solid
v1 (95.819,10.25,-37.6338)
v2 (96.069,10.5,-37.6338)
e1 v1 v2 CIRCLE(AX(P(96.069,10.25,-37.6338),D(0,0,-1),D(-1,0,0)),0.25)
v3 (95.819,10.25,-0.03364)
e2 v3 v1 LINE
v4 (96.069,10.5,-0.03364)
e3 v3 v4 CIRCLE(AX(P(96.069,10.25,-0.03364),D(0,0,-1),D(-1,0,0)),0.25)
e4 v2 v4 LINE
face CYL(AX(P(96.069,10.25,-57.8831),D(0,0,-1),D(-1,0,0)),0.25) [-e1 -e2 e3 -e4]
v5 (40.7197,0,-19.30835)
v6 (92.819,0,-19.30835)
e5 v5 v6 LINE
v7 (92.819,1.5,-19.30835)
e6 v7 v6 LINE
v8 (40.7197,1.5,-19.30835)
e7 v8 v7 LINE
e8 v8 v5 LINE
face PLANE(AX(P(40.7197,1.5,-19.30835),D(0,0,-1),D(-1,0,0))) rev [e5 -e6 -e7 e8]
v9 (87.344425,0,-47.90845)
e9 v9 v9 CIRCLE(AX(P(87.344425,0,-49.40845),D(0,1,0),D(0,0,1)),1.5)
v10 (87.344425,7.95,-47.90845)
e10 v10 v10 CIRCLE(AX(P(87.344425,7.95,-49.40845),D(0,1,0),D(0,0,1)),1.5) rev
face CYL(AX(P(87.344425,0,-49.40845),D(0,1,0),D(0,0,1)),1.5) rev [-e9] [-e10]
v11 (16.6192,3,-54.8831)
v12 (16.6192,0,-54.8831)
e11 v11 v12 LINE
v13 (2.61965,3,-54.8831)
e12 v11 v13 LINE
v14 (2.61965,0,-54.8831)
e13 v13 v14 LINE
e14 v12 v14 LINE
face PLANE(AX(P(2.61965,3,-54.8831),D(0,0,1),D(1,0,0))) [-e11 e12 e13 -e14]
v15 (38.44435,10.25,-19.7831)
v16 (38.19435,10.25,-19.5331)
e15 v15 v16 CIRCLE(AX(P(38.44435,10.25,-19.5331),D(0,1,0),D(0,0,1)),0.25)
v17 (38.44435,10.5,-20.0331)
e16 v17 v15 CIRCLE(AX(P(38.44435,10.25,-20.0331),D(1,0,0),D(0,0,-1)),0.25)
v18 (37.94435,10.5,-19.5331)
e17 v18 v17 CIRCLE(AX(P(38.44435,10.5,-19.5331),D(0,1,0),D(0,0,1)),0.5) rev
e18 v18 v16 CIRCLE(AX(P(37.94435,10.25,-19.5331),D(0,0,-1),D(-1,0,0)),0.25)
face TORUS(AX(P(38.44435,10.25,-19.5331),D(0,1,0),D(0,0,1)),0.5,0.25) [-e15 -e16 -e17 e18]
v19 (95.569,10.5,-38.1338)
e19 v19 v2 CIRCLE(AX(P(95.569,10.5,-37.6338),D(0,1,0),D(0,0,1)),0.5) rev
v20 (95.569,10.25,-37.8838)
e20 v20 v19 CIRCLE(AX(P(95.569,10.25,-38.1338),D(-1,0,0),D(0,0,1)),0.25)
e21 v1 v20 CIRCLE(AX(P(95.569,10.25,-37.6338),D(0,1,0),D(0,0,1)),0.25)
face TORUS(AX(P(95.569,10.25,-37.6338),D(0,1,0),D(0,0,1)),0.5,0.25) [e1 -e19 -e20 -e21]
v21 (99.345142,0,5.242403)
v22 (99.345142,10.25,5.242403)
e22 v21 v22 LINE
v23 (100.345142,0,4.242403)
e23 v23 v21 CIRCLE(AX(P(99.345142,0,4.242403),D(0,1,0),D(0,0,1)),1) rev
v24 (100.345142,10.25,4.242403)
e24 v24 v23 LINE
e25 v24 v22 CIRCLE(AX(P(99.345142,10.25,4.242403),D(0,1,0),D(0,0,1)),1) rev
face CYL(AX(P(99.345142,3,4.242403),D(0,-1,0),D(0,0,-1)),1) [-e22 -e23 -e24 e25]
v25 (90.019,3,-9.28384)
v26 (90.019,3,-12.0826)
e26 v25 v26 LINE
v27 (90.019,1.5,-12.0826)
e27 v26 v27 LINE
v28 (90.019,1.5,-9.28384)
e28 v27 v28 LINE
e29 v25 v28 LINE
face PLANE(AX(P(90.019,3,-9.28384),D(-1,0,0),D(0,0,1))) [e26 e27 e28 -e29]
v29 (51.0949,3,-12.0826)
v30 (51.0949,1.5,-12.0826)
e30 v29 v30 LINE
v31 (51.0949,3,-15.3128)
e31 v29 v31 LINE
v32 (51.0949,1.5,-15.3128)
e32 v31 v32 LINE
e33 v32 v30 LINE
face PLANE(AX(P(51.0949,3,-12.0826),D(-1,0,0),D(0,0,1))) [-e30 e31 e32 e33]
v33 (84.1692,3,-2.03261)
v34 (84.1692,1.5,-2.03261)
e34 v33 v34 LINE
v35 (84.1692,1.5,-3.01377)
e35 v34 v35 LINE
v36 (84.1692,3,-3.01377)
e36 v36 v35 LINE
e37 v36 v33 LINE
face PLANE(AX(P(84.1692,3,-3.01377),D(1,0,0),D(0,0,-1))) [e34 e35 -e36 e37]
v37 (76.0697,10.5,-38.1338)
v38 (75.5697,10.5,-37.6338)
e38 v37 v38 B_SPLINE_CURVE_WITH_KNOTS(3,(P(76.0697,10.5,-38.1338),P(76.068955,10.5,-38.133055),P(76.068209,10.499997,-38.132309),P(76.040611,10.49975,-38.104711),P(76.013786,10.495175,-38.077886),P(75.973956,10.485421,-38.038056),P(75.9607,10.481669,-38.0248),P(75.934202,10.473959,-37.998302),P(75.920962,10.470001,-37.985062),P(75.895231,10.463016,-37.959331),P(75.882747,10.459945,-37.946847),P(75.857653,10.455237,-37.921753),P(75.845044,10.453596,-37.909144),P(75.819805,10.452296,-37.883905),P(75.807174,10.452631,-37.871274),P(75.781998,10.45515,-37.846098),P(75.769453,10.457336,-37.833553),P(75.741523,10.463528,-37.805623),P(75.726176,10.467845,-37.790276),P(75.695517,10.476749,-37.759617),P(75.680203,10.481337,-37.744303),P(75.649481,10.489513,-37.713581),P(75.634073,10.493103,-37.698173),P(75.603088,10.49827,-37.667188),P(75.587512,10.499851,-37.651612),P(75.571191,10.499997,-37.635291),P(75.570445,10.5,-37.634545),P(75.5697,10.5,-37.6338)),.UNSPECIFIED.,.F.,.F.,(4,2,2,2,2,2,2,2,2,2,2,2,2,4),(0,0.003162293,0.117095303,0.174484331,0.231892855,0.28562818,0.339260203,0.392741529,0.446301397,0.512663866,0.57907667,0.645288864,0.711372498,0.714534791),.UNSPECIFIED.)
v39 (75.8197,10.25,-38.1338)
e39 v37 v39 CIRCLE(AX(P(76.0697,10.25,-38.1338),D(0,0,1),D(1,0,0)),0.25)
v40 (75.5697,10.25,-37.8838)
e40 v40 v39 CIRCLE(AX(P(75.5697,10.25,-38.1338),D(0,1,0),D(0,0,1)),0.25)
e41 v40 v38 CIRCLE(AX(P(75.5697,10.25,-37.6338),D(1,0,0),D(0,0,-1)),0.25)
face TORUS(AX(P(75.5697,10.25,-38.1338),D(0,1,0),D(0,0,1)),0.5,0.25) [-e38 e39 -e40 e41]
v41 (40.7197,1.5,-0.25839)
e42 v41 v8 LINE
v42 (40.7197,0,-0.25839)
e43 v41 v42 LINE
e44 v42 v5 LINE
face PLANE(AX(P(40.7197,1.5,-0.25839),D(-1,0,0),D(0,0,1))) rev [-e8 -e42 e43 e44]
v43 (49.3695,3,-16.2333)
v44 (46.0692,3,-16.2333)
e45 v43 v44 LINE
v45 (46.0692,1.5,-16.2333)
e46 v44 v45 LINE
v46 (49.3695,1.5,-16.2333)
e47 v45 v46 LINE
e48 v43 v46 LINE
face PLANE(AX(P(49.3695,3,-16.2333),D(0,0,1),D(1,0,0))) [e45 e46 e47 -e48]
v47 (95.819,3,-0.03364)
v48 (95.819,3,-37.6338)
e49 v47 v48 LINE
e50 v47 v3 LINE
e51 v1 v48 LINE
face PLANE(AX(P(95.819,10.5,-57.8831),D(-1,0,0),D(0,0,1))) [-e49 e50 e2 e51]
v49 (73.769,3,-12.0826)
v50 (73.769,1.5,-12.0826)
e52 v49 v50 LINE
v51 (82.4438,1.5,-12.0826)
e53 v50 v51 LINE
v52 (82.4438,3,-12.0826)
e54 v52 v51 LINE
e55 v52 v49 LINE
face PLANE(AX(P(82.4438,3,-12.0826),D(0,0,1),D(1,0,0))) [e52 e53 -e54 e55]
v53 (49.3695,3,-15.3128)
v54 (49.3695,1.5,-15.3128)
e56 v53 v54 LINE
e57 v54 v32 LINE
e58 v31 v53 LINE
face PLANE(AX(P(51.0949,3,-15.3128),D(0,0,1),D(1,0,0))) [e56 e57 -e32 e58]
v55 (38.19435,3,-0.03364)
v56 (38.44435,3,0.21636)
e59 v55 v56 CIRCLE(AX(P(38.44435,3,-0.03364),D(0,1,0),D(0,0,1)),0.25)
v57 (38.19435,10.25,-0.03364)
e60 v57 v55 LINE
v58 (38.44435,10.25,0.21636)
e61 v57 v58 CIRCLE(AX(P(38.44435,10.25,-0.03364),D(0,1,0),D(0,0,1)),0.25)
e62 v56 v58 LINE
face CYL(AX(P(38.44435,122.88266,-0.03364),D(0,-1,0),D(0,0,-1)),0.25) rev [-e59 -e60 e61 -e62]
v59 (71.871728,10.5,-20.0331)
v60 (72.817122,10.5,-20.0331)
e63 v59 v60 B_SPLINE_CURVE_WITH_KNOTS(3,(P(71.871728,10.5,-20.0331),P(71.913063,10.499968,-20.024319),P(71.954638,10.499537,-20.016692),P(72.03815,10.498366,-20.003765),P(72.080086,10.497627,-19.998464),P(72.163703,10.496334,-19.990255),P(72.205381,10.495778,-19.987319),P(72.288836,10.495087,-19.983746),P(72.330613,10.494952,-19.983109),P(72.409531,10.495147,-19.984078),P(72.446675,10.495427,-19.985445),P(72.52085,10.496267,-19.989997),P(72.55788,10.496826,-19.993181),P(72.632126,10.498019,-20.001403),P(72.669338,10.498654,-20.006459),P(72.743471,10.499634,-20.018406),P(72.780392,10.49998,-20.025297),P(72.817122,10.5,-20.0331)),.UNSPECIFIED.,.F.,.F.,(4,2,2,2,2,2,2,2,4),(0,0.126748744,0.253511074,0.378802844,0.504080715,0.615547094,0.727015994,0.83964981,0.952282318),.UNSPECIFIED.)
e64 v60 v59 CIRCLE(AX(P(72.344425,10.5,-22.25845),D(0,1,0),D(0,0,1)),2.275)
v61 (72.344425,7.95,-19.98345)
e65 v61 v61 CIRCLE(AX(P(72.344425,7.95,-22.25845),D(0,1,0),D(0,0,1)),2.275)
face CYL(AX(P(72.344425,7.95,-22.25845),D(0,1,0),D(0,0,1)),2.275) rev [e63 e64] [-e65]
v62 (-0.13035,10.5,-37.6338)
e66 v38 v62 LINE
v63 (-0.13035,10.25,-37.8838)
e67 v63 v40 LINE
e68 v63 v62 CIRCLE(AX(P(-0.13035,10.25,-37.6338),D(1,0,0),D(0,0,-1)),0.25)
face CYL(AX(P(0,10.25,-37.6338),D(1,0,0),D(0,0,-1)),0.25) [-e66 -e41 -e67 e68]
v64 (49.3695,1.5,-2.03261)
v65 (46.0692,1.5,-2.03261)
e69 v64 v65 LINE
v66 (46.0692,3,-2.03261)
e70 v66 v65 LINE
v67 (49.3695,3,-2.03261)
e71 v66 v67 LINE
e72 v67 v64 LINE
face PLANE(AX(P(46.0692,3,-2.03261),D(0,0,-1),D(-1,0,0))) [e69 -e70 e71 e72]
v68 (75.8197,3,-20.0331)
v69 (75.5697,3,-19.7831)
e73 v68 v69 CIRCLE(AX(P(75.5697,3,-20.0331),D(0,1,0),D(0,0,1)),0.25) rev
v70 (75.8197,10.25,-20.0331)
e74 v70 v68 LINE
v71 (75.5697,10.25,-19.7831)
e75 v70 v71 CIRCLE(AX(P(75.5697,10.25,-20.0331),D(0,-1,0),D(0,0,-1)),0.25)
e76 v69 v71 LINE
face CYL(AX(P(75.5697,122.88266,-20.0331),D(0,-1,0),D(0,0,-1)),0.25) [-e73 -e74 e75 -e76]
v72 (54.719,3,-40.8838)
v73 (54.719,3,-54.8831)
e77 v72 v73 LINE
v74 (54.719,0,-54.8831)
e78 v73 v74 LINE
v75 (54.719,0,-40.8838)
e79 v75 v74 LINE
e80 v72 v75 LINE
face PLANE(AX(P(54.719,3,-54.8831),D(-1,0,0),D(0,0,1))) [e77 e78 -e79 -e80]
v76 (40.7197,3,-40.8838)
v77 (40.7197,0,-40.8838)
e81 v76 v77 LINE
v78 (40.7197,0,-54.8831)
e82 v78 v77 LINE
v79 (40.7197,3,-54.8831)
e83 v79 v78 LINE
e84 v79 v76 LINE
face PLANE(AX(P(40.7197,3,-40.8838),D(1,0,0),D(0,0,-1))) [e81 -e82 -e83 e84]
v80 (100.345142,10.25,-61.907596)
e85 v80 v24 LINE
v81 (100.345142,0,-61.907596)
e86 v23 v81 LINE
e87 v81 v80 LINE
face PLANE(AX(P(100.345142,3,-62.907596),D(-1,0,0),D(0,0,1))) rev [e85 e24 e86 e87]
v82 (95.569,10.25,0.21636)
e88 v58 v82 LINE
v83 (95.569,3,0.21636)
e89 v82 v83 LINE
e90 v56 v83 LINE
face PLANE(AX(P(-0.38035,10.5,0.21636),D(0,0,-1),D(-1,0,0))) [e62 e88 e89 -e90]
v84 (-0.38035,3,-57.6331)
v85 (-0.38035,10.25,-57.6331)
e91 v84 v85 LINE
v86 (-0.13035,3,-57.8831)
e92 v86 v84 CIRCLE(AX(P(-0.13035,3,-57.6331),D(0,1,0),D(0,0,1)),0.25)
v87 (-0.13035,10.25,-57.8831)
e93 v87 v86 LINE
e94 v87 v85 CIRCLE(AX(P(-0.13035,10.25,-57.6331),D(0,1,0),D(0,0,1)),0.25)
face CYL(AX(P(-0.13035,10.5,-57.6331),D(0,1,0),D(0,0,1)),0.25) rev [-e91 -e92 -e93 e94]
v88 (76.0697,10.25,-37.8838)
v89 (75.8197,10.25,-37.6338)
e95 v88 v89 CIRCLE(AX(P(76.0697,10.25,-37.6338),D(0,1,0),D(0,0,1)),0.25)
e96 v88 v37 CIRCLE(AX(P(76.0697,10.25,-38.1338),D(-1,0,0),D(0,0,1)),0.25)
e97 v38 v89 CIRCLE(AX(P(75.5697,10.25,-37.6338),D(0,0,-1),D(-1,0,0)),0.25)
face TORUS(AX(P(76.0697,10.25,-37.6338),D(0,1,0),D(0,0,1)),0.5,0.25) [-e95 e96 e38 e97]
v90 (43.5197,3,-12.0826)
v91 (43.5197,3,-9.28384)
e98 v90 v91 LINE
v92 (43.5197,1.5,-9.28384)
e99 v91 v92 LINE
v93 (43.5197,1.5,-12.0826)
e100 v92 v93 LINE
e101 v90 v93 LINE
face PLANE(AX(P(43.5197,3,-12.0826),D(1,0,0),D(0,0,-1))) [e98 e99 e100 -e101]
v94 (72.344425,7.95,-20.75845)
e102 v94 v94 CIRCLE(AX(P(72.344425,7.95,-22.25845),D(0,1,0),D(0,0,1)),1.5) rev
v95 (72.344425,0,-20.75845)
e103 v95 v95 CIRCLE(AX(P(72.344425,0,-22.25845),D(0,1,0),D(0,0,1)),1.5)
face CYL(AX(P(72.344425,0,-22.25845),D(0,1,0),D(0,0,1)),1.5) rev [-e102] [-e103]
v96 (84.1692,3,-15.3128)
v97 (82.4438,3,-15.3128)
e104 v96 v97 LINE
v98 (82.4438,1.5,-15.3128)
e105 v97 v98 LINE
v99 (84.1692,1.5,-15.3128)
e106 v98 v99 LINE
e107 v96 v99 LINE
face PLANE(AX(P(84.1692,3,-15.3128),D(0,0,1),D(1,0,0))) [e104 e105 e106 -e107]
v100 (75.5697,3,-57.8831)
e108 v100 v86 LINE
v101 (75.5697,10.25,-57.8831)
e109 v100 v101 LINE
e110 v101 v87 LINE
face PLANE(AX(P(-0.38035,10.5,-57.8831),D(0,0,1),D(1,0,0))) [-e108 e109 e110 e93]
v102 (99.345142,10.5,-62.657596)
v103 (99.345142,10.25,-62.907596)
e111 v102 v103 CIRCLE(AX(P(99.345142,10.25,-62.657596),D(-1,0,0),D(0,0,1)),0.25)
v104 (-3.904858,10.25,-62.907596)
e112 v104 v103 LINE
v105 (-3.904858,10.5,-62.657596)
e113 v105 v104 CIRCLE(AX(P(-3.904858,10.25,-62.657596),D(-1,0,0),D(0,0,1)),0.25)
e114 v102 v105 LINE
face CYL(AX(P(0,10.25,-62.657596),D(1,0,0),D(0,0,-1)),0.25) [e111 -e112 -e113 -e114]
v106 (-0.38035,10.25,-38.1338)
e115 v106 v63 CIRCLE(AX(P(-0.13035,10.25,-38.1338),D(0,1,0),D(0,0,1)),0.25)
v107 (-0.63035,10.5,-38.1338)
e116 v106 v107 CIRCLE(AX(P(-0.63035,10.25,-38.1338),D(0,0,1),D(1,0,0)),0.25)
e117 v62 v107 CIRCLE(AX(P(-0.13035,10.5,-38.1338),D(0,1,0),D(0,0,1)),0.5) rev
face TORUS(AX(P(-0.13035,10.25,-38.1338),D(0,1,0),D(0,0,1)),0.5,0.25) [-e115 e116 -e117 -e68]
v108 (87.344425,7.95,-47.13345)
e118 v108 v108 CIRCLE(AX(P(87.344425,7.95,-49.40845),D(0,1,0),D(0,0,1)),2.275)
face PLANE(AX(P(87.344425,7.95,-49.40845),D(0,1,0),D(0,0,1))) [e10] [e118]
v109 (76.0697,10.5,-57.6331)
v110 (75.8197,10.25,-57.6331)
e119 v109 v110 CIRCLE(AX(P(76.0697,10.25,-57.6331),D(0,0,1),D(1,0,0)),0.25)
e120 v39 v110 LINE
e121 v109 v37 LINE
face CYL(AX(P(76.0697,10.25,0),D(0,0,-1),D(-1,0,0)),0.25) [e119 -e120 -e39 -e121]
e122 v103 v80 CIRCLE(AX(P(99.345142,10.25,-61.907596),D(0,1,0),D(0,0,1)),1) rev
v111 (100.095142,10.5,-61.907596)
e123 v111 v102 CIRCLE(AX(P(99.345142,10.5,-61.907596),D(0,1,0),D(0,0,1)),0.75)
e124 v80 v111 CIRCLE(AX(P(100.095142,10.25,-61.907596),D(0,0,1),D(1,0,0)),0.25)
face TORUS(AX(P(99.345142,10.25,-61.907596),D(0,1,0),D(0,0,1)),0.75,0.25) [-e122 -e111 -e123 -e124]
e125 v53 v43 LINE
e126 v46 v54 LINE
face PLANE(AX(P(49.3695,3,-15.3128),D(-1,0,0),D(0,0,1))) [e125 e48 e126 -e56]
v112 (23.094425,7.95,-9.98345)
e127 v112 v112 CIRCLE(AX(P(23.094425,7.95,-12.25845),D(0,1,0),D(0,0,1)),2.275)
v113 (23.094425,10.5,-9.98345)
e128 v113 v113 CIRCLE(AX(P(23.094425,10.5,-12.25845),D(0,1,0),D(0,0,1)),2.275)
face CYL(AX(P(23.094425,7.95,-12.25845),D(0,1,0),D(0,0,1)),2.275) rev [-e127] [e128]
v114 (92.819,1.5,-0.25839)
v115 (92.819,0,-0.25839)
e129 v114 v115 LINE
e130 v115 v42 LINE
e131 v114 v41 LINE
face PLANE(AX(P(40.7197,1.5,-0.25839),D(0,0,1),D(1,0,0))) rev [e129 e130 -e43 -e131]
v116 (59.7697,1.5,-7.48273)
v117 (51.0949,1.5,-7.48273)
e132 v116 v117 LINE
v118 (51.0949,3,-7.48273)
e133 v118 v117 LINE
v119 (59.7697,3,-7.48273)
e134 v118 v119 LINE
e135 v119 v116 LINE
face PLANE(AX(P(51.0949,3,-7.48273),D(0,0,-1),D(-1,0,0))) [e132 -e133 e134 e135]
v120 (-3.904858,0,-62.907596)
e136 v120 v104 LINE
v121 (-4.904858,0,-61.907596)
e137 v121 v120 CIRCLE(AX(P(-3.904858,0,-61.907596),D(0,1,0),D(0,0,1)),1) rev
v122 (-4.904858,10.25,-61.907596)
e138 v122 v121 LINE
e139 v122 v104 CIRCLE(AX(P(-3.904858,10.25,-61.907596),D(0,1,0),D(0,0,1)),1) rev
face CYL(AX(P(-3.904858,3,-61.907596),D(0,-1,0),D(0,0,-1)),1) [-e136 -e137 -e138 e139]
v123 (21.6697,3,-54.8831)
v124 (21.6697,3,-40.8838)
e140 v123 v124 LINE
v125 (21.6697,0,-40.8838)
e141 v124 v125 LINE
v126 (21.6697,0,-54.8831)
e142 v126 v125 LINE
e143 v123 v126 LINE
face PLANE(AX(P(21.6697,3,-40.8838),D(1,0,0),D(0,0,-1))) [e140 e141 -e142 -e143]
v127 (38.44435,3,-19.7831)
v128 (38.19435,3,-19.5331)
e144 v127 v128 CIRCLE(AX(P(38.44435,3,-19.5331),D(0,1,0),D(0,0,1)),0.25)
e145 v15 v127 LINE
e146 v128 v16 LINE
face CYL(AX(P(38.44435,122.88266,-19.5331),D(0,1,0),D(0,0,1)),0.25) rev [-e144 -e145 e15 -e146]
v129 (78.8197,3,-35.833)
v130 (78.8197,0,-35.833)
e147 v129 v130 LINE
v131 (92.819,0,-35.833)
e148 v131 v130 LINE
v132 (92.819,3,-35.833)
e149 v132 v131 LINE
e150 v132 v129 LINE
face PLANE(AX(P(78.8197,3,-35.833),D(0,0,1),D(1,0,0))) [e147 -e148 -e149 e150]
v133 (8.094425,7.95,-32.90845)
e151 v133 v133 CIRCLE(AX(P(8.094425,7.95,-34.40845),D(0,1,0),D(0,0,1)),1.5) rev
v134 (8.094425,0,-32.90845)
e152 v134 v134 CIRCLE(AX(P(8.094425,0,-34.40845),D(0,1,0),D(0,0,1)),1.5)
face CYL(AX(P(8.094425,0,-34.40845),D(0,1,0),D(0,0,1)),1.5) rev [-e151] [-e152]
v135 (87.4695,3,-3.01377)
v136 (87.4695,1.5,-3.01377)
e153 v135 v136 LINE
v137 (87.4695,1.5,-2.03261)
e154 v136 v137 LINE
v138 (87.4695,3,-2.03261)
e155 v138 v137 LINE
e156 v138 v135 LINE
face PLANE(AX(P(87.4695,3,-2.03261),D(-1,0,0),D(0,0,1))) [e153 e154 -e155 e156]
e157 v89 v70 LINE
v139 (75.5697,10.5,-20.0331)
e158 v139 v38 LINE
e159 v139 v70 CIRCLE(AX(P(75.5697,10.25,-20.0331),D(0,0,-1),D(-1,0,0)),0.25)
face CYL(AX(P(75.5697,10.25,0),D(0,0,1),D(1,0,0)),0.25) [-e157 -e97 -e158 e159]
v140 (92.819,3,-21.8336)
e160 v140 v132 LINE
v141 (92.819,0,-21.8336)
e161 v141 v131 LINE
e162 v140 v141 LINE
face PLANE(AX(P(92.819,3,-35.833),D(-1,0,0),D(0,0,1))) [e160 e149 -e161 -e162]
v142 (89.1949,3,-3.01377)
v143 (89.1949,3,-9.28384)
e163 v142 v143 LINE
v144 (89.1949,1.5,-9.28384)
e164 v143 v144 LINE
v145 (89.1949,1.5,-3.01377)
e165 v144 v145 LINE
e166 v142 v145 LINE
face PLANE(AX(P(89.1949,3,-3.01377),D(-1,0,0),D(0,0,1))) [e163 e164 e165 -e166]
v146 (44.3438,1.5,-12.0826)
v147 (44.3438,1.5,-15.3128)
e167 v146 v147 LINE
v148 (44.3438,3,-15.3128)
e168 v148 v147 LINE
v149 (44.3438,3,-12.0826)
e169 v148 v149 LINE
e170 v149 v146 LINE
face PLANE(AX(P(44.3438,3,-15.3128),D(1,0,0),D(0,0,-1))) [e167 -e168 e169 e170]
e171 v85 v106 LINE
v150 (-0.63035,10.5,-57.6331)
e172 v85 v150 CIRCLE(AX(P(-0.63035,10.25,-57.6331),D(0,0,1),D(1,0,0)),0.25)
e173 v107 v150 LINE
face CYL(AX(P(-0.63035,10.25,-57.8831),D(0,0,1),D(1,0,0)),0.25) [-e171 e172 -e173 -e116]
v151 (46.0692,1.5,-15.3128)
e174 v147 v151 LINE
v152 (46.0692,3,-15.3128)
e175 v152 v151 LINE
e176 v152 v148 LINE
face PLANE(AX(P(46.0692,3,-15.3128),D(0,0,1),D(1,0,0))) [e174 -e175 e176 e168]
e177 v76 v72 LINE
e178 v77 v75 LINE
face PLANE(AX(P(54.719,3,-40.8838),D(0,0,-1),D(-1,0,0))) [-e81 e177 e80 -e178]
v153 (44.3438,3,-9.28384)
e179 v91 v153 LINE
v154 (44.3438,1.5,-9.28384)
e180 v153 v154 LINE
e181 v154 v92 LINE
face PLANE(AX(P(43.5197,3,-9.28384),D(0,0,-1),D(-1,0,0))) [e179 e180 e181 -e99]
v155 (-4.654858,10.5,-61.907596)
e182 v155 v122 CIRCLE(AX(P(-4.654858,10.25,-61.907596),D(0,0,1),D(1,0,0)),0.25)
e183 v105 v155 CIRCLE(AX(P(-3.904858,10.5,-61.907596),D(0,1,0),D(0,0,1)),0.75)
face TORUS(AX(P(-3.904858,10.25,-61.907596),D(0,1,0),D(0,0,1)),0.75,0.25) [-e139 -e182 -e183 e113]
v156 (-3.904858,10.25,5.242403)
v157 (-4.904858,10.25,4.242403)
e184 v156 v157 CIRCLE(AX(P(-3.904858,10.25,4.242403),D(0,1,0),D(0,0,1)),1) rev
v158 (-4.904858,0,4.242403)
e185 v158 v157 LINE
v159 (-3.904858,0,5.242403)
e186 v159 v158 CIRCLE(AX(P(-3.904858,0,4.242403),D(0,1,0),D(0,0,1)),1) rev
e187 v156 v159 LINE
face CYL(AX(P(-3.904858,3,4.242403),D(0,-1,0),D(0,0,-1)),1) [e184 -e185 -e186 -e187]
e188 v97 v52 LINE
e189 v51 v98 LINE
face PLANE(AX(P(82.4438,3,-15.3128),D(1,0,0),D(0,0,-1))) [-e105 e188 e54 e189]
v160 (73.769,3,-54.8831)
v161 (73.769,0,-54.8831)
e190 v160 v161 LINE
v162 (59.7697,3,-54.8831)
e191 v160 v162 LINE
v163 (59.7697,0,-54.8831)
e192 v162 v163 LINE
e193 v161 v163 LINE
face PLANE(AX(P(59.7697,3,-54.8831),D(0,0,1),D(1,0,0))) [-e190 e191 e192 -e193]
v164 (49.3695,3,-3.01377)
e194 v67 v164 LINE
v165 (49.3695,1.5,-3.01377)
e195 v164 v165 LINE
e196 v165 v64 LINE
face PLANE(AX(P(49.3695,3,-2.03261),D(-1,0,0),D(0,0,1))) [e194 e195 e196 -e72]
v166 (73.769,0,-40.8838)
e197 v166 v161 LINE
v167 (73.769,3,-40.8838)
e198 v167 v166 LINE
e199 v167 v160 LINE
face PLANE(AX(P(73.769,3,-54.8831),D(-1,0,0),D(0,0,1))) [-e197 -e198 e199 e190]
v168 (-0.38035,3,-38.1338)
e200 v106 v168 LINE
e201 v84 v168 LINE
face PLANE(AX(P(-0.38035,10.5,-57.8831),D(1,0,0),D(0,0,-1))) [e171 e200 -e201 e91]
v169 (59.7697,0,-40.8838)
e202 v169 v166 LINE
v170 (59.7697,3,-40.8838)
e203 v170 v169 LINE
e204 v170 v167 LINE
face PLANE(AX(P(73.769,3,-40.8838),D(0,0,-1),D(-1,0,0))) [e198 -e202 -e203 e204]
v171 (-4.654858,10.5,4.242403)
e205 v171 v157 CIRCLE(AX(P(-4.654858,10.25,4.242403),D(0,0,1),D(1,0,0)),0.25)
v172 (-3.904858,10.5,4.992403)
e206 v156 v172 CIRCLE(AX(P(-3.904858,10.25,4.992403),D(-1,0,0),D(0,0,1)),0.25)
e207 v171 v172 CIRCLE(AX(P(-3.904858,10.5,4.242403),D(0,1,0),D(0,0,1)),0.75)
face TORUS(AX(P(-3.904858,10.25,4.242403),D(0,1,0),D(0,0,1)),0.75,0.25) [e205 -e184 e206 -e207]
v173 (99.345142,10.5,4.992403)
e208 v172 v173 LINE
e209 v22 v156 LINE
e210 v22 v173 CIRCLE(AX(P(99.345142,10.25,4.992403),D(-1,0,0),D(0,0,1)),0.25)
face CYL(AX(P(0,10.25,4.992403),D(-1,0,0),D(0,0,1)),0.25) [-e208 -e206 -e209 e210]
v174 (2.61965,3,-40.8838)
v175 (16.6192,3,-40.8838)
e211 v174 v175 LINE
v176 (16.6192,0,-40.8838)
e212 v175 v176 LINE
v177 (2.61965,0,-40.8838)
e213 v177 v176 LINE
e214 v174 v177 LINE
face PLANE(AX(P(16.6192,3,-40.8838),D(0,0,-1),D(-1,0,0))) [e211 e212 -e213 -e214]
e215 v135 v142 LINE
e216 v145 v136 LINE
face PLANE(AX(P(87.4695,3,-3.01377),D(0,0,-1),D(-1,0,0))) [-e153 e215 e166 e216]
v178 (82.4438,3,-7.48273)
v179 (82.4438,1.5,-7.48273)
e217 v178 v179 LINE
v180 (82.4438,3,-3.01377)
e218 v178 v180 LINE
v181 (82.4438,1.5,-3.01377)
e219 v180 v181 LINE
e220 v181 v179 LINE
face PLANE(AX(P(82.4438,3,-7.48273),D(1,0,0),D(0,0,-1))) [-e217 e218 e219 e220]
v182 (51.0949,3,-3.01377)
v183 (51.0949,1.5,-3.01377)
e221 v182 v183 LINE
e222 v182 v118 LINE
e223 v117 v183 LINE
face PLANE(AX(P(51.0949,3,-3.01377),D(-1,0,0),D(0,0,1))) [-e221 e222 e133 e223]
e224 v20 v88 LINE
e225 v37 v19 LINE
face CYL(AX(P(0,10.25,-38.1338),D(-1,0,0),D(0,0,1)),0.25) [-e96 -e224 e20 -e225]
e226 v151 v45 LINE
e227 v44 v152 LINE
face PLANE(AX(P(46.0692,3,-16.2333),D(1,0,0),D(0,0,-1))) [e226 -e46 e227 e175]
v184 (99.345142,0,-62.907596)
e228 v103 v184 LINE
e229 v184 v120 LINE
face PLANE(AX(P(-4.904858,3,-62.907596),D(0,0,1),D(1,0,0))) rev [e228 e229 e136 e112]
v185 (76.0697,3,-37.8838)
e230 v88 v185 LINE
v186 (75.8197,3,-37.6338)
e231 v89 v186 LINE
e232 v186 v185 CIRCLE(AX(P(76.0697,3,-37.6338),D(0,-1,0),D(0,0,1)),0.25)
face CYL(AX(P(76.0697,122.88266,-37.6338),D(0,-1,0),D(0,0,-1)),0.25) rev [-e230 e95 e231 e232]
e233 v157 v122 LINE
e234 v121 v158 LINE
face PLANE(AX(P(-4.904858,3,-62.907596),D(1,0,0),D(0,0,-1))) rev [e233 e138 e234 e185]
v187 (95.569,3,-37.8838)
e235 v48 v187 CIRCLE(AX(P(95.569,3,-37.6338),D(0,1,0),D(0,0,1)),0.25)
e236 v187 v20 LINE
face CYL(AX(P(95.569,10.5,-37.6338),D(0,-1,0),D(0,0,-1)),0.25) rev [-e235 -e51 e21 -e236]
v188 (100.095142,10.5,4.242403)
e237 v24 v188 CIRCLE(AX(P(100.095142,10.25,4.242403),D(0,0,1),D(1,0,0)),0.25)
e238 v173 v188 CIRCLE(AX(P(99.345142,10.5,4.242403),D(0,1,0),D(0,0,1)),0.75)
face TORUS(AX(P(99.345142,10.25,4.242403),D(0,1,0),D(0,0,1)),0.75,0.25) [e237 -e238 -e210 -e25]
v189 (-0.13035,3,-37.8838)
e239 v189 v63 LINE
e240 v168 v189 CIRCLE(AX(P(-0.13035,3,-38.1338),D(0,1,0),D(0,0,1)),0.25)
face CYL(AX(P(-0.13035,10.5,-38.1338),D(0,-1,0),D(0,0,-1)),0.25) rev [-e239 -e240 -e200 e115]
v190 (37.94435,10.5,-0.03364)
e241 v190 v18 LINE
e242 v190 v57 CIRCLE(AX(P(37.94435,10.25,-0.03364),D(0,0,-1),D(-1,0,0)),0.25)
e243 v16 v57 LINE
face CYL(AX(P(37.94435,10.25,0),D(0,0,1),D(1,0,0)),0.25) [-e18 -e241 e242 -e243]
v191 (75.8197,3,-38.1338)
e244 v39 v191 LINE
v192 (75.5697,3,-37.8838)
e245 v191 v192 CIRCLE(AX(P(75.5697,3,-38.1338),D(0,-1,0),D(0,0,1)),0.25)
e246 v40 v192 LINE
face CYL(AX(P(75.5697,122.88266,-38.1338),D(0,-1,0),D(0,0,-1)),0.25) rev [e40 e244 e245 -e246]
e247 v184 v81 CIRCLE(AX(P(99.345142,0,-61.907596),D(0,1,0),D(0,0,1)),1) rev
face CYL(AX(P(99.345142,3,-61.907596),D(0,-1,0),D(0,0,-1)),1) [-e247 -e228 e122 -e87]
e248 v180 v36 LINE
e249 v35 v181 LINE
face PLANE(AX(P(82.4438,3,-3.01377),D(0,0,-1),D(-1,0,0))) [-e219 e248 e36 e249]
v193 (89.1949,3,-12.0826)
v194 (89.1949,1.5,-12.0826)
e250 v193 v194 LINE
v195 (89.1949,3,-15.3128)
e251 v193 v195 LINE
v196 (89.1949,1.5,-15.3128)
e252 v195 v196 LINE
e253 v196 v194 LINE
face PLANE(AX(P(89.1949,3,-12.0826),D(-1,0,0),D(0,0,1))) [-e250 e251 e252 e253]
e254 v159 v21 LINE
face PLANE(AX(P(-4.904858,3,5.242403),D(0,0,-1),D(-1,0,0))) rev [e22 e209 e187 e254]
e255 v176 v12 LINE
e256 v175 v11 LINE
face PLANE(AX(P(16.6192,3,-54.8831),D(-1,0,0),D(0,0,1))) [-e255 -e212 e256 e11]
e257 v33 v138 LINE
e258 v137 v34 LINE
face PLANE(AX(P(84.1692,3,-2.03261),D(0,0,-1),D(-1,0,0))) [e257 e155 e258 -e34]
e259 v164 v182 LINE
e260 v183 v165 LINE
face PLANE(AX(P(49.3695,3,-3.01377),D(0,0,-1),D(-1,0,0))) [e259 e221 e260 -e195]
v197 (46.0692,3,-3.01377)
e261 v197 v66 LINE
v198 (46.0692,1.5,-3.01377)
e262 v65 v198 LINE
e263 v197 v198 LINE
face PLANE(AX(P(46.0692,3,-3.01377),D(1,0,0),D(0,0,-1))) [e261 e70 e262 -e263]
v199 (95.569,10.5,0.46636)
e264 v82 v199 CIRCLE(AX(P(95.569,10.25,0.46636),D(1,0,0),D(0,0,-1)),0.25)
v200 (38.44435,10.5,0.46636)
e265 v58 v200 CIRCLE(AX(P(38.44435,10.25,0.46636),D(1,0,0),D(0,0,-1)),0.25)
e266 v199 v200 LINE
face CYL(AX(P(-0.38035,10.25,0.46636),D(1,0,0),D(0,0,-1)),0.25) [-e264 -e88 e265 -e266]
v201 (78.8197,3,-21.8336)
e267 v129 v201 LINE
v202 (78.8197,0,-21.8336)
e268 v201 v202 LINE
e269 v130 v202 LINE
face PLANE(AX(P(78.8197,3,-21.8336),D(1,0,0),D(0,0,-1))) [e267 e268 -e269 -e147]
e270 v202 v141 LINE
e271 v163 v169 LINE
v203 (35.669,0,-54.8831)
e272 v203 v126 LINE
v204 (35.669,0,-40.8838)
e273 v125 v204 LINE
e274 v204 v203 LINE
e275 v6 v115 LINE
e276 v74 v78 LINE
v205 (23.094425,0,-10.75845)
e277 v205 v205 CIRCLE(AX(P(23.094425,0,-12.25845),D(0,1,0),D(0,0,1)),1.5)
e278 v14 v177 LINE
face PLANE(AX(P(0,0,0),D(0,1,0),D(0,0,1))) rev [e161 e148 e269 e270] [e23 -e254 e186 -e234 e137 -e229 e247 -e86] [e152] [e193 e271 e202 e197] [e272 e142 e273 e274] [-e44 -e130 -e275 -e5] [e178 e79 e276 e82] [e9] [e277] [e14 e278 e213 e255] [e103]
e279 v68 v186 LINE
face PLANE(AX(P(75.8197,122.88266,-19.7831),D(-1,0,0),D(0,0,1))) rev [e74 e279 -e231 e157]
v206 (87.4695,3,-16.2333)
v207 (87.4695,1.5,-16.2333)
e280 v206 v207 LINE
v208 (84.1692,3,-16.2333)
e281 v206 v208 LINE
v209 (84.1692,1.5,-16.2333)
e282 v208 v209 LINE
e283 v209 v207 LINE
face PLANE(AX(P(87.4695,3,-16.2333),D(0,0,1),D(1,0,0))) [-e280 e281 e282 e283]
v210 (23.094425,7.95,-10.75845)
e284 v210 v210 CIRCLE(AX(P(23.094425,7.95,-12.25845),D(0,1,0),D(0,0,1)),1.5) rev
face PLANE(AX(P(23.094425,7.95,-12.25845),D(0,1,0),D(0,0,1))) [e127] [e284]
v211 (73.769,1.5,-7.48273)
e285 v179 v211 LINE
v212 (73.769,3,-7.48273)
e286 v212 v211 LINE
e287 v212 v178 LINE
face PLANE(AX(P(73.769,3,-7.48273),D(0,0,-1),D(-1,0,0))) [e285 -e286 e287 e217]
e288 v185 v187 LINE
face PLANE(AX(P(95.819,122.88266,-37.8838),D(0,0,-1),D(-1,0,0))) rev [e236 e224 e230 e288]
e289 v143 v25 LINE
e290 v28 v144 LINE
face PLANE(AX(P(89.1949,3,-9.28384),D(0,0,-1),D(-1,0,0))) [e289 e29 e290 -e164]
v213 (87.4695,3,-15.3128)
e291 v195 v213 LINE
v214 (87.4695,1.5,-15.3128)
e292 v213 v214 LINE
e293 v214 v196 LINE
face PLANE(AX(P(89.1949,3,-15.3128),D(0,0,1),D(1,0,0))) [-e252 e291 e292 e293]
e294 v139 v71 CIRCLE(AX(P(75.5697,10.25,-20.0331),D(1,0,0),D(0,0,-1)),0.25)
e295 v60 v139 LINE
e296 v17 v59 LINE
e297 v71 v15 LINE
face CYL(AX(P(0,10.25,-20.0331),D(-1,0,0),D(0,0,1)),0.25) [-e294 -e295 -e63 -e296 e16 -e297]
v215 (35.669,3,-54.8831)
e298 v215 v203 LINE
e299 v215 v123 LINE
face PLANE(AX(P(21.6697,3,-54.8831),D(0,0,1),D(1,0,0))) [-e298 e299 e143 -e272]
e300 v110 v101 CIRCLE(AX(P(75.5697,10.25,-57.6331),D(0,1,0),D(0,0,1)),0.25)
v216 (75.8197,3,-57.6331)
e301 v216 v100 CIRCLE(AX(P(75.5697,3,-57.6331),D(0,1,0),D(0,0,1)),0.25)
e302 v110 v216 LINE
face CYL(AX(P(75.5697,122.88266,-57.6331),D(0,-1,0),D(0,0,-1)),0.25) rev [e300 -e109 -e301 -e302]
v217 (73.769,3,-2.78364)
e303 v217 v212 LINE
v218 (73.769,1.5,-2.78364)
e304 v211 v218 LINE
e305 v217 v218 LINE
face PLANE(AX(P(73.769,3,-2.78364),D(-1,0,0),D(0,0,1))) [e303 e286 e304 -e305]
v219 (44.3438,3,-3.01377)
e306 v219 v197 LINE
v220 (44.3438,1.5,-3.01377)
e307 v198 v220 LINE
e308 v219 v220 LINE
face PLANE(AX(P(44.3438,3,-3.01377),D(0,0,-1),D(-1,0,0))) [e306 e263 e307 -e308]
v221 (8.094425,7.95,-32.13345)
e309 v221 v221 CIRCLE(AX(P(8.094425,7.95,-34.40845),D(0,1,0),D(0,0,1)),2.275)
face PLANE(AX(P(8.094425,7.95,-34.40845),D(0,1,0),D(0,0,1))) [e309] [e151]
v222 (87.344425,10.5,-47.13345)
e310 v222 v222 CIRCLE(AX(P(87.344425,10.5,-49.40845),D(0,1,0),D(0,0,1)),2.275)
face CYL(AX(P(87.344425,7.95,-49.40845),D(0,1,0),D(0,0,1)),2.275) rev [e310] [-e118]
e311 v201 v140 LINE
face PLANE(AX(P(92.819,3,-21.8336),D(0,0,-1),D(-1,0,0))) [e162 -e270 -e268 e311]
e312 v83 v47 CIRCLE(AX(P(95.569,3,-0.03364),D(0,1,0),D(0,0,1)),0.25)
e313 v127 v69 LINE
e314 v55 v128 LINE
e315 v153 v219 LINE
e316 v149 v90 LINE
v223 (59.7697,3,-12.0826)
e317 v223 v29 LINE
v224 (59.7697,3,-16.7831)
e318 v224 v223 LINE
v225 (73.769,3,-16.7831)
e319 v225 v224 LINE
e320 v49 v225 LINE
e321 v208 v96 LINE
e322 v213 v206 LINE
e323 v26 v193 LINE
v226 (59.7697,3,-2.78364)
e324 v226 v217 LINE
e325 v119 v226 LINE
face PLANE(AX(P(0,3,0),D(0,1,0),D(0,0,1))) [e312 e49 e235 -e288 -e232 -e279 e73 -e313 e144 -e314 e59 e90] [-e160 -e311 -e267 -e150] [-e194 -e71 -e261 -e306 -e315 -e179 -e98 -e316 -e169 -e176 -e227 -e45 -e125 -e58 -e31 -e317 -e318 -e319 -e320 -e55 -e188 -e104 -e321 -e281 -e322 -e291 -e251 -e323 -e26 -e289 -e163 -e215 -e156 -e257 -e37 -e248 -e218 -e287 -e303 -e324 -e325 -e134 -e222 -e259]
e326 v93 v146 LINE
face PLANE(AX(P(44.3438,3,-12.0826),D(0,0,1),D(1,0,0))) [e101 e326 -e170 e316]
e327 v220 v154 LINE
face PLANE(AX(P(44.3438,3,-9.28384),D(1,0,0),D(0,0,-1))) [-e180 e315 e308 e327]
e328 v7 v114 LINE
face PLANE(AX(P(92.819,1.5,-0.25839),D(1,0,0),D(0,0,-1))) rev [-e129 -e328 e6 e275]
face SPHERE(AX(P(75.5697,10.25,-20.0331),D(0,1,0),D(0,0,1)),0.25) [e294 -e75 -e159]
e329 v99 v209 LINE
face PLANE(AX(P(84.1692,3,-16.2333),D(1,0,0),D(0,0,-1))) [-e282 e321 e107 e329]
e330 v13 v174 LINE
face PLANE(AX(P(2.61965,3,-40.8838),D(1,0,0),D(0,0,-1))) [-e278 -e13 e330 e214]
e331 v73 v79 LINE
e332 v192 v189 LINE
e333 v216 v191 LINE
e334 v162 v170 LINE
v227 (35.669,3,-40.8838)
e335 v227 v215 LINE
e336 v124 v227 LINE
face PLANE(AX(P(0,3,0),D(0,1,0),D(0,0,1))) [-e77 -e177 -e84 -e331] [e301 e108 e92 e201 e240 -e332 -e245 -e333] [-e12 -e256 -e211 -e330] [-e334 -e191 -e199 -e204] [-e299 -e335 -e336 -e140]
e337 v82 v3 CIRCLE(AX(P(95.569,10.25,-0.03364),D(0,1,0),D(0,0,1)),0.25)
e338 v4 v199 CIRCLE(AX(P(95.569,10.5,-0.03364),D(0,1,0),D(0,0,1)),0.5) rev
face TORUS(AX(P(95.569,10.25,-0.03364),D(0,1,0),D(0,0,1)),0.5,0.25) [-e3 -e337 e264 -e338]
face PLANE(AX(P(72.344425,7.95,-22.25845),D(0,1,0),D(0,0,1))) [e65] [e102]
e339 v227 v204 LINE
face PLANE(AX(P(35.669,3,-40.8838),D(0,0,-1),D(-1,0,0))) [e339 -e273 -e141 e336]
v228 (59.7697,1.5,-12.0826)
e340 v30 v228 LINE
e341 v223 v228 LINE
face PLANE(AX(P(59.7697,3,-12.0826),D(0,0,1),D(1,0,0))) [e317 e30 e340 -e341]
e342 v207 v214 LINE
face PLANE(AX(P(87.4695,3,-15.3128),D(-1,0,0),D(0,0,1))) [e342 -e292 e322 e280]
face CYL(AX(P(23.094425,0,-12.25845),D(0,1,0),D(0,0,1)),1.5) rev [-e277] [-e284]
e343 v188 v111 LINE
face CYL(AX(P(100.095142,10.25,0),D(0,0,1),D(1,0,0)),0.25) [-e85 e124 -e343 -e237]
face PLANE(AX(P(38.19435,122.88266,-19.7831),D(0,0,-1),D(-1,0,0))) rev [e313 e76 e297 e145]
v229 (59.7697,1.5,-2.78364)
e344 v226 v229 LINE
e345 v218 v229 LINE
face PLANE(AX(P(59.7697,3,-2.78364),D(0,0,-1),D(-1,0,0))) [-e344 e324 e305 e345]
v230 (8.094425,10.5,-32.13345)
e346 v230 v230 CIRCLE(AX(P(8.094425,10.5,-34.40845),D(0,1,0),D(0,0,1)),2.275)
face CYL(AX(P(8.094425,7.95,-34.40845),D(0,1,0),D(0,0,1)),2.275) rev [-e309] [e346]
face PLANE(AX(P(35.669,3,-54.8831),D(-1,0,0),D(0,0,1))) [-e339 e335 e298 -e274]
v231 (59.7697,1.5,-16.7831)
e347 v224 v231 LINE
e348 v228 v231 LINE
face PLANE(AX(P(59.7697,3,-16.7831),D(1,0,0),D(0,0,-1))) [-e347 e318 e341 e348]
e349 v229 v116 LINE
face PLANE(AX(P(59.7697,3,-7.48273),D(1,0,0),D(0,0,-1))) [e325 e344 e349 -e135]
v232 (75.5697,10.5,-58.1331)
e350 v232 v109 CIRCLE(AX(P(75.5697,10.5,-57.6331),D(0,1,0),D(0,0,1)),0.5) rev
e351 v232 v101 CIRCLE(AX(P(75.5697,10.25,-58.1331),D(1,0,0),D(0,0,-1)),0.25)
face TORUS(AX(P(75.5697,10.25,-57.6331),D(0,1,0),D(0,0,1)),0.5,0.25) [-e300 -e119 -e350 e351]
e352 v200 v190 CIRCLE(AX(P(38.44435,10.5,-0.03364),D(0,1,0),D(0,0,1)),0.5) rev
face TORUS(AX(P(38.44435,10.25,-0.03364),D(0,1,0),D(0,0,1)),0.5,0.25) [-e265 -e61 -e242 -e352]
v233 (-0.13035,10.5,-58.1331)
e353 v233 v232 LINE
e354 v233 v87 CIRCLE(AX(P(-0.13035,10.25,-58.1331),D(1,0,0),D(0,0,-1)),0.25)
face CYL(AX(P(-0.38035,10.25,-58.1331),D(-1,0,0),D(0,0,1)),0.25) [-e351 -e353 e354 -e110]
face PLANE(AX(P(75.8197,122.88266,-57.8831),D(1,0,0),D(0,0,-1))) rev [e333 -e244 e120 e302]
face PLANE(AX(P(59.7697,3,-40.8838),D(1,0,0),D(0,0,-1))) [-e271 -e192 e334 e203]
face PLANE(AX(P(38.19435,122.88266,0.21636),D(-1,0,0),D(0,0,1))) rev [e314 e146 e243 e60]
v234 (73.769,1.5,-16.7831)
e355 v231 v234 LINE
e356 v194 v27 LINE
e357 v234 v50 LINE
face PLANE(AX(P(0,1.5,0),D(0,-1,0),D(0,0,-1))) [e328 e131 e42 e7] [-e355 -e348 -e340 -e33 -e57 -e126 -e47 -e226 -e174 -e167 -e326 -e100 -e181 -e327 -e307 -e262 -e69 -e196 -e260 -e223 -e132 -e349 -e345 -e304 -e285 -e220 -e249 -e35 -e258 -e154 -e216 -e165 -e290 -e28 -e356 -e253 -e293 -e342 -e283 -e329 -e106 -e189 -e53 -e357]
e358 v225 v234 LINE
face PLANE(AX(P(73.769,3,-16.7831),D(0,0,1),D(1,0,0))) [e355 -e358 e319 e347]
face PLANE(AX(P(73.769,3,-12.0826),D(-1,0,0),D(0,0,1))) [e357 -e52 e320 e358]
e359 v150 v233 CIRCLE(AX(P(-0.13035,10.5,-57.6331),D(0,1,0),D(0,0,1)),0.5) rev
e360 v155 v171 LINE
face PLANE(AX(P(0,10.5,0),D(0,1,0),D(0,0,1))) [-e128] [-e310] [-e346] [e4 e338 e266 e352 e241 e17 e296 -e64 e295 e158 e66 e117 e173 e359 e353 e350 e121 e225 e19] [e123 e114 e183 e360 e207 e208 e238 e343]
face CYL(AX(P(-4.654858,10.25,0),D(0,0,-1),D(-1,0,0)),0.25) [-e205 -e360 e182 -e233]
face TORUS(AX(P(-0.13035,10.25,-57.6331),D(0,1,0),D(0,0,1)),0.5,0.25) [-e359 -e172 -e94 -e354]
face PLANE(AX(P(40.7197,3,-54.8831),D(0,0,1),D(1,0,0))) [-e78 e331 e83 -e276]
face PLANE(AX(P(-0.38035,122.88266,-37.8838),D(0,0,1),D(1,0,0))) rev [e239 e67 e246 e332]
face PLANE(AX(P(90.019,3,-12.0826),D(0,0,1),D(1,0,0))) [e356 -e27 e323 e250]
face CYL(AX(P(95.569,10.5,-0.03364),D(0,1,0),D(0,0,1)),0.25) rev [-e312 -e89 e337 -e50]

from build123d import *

# Parameters (mm, degrees)
SKETCH5_W           = 105.25
SKETCH5_H           = 68.15
SKETCH5_W_2         = 13.9993
SKETCH5_H_2         = 13.9994
SKETCH5_H_3         = 13.9993
SKETCH5_W_3         = 13.99955
BOSS_EXTRUDE1_DEPTH = 3
SKETCH6_W           = 52.0993
SKETCH6_H           = 19.04996
CUT_EXTRUDE1_DEPTH  = 1.5
SKETCH7_W           = 105.25
SKETCH7_H           = 68.15
SKETCH7_W_2         = 96.19935
SKETCH7_H_2         = 58.09946
BOSS_EXTRUDE2_DEPTH = 7.5
SKETCH9_R           = 1.5
CUT_EXTRUDE3_DEPTH  = 119.670818994
BOSS_EXTRUDE4_START = 7.5
SKETCH10_R          = 1.5
BOSS_EXTRUDE4_DEPTH = 7.5
SKETCH13_R          = 2.275
CUT_EXTRUDE5_DEPTH  = 2.55
FILLET1_R           = 0.25
FILLET2_R           = 1
FILLET3_R           = 0.25


with BuildPart() as part:
    # Sketch5 → Boss-Extrude1 (new body)
    with BuildSketch(Plane(origin=(0, 0, 0), x_dir=(1, 0, 0), z_dir=(0, 1, 0))):
        with Locations((47.7201423, 28.8325965)):
            Rectangle(SKETCH5_W, SKETCH5_H)
        Polygon((82.4438, 7.48273), (82.4438, 3.01377), (84.1692, 3.01377), (84.1692, 2.03261), (87.4695, 2.03261), (87.4695, 3.01377), (89.1949, 3.01377), (89.1949, 9.28384), (90.019, 9.28384), (90.019, 12.0826), (89.1949, 12.0826), (89.1949, 15.3128), (87.4695, 15.3128), (87.4695, 16.2333), (84.1692, 16.2333), (84.1692, 15.3128), (82.4438, 15.3128), (82.4438, 12.0826), (73.769, 12.0826), (73.769, 16.7831), (59.7697, 16.7831), (59.7697, 12.0826), (51.0949, 12.0826), (51.0949, 15.3128), (49.3695, 15.3128), (49.3695, 16.2333), (46.0692, 16.2333), (46.0692, 15.3128), (44.3438, 15.3128), (44.3438, 12.0826), (43.5197, 12.0826), (43.5197, 9.28384), (44.3438, 9.28384), (44.3438, 3.01377), (46.0692, 3.01377), (46.0692, 2.03261), (49.3695, 2.03261), (49.3695, 3.01377), (51.0949, 3.01377), (51.0949, 7.48273), (59.7697, 7.48273), (59.7697, 2.78364), (73.769, 2.78364), (73.769, 7.48273), align=None, mode=Mode.SUBTRACT)
        with Locations((85.81935, 28.8333)):
            Rectangle(SKETCH5_W_2, SKETCH5_H_2, mode=Mode.SUBTRACT)
        with Locations((66.76935, 47.88345)):
            Rectangle(SKETCH5_W_2, SKETCH5_H_3, mode=Mode.SUBTRACT)
        with Locations((47.71935, 47.88345)):
            Rectangle(SKETCH5_W_2, SKETCH5_H_3, mode=Mode.SUBTRACT)
        with Locations((28.66935, 47.88345)):
            Rectangle(SKETCH5_W_2, SKETCH5_H_3, mode=Mode.SUBTRACT)
        with Locations((9.619425, 47.88345)):
            Rectangle(SKETCH5_W_3, SKETCH5_H_3, mode=Mode.SUBTRACT)
    extrude(amount=BOSS_EXTRUDE1_DEPTH)

    # Sketch6 → Cut-Extrude1 (cut)
    with BuildSketch(Plane.XZ):
        with Locations((66.76935, -9.78337)):
            Rectangle(SKETCH6_W, SKETCH6_H)
    extrude(amount=-CUT_EXTRUDE1_DEPTH, mode=Mode.SUBTRACT)

    # Sketch7 → Boss-Extrude2 (add)
    with BuildSketch(Plane(origin=(0, 3, 0), x_dir=(1, 0, 0), z_dir=(0, 1, 0))):
        with Locations((47.7201423, 28.8325965)):
            Rectangle(SKETCH7_W, SKETCH7_H)
        with Locations((47.719325, 28.83337)):
            Rectangle(SKETCH7_W_2, SKETCH7_H_2, mode=Mode.SUBTRACT)
    extrude(amount=BOSS_EXTRUDE2_DEPTH)

    # Sketch9 → Cut-Extrude3 (cut, through all)
    with BuildSketch(Plane(origin=(0, 3, 0), x_dir=(1, 0, 0), z_dir=(0, 1, 0))):
        with Locations(Location((8.094425, 34.40845, 0), (0, 0, 270))):
            Circle(SKETCH9_R)
        with Locations(Location((23.094425, 12.25845, 0), (0, 0, 270))):
            Circle(SKETCH9_R)
        with Locations(Location((87.344425, 49.40845, 0), (0, 0, 270))):
            Circle(SKETCH9_R)
        with Locations(Location((72.344425, 22.25845, 0), (0, 0, 270))):
            Circle(SKETCH9_R)
    extrude(amount=-CUT_EXTRUDE3_DEPTH, mode=Mode.SUBTRACT)

    # Sketch10 → Boss-Extrude4 (add)
    with BuildSketch(Plane(origin=(0, 3, 0), x_dir=(1, 0, 0), z_dir=(0, 1, 0)).offset(BOSS_EXTRUDE4_START)):
        with BuildLine():
            Line((-0.38035, -0.21636), (-0.38035, 37.8838))
            Line((-0.38035, 37.8838), (75.5697, 37.8838))
            ThreePointArc((75.5697, 37.8838), (75.746476695, 37.957023305), (75.8197, 38.1338))
            Line((75.8197, 38.1338), (75.8197, 57.8831))
            Line((75.8197, 57.8831), (95.819, 57.8831))
            Line((95.819, 57.8831), (95.819, 37.8838))
            Line((95.819, 37.8838), (76.0697, 37.8838))
            ThreePointArc((76.0697, 37.8838), (75.892923305, 37.810576695), (75.8197, 37.6338))
            Line((75.8197, 37.6338), (75.8197, 19.7831))
            Line((75.8197, 19.7831), (38.19435, 19.7831))
            Line((38.19435, 19.7831), (38.19435, -0.21636))
            Line((38.19435, -0.21636), (-0.38035, -0.21636))
        make_face()
        with Locations(Location((87.344425, 49.40845, 0), (0, 0, 270))):
            Circle(SKETCH10_R, mode=Mode.SUBTRACT)
        with Locations(Location((72.344425, 22.25845, 0), (0, 0, 270))):
            Circle(SKETCH10_R, mode=Mode.SUBTRACT)
        with Locations(Location((8.094425, 34.40845, 0), (0, 0, 270))):
            Circle(SKETCH10_R, mode=Mode.SUBTRACT)
        with Locations(Location((23.094425, 12.25845, 0), (0, 0, 270))):
            Circle(SKETCH10_R, mode=Mode.SUBTRACT)
    extrude(amount=-BOSS_EXTRUDE4_DEPTH)

    # Sketch13 → Cut-Extrude5 (cut)
    with BuildSketch(Plane(origin=(0, 10.5, 0), x_dir=(1, 0, 0), z_dir=(0, 1, 0))):
        with Locations(Location((8.094425, 34.40845, 0), (0, 0, 270))):
            Circle(SKETCH13_R)
        with Locations(Location((23.094425, 12.25845, 0), (0, 0, 270))):
            Circle(SKETCH13_R)
        with Locations(Location((87.344425, 49.40845, 0), (0, 0, 270))):
            Circle(SKETCH13_R)
        with Locations(Location((72.344425, 22.25845, 0), (0, 0, 270))):
            Circle(SKETCH13_R)
    extrude(amount=-CUT_EXTRUDE5_DEPTH, mode=Mode.SUBTRACT)

    # Fillet1
    fillet1_edges = [part.edges().sort_by_distance(p)[0] for p in [
        (95.819, 6.75, 0.21636),
        (-0.38035, 6.75, -57.8831),
        (75.8197, 6.75, -57.8831),
        (95.819, 6.75, -37.8838),
        (75.8197, 6.75, -19.7831),
        (38.19435, 6.75, -19.7831),
        (38.19435, 6.75, 0.21636),
        (-0.38035, 6.75, -37.8838),
    ]]
    fillet(fillet1_edges, radius=FILLET1_R)

    # Fillet2
    fillet2_edges = [part.edges().sort_by_distance(p)[0] for p in [
        (-4.9048577, 5.25, -62.9075965),
        (100.3451423, 5.25, -62.9075965),
        (100.3451423, 5.25, 5.2424035),
        (-4.9048577, 5.25, 5.2424035),
    ]]
    fillet(fillet2_edges, radius=FILLET2_R)

    # Fillet3
    # the kernel refuses this fillet: 0.25 mm, written as the material it takes off along each edge
    with BuildSketch(Plane(origin=(75.5697, 10.5, -38.1338), x_dir=(0, 0, 1), z_dir=(-1, 0, 0))) as fillet3_piece_1:
        with BuildLine():
            CenterArc((0.25 + FILLET3_R, -FILLET3_R), FILLET3_R, 90, 90)
            Line((0.25, -FILLET3_R), (0.25, 0))
            Line((0.25, 0), (0.25 + FILLET3_R, 0))
        make_face()
    revolve(axis=Axis((75.5697, 10.5, -38.1338), (0, 1, 0)), revolution_arc=90, mode=Mode.SUBTRACT)
    with BuildSketch(Plane(origin=(-0.13035, 10.5, -37.8838), x_dir=(0, 0, 1), z_dir=(1, 0, 0))) as fillet3_piece_2:
        with BuildLine():
            CenterArc((FILLET3_R, FILLET3_R), FILLET3_R, 180, 90)
            Line((0, FILLET3_R), (0, 0))
            Line((0, 0), (FILLET3_R, 0))
        make_face()
    extrude(amount=75.70005, mode=Mode.SUBTRACT)
    with BuildSketch(Plane(origin=(76.0697, 10.5, -37.6338), x_dir=(0, 0, -1), z_dir=(1, 0, 0))) as fillet3_piece_3:
        with BuildLine():
            CenterArc((0.25 + FILLET3_R, -FILLET3_R), FILLET3_R, 90, 90)
            Line((0.25, -FILLET3_R), (0.25, 0))
            Line((0.25, 0), (0.25 + FILLET3_R, 0))
        make_face()
    revolve(axis=Axis((76.0697, 10.5, -37.6338), (0, 1, 0)), revolution_arc=90, mode=Mode.SUBTRACT)
    with BuildSketch(Plane(origin=(95.569, 10.5, -37.8838), x_dir=(0, 0, -1), z_dir=(-1, 0, 0)), Plane(origin=(75.8197, 10.5, -38.1338), x_dir=(1, 0, 0), z_dir=(0, 0, -1))) as fillet3_piece_4:
        with BuildLine():
            CenterArc((FILLET3_R, FILLET3_R), FILLET3_R, 180, 90)
            Line((0, FILLET3_R), (0, 0))
            Line((0, 0), (FILLET3_R, 0))
        make_face()
    extrude(amount=19.4993, mode=Mode.SUBTRACT)
    with BuildSketch(Plane(origin=(95.569, 10.5, 0.21636), x_dir=(0, 0, 1), z_dir=(-1, 0, 0))) as fillet3_piece_5:
        with BuildLine():
            CenterArc((FILLET3_R, -FILLET3_R), FILLET3_R, 90, 90)
            Line((0, -FILLET3_R), (0, 0))
            Line((0, 0), (FILLET3_R, 0))
        make_face()
    extrude(amount=57.12465, mode=Mode.SUBTRACT)
    with BuildSketch(Plane(origin=(95.819, 10.5, -37.6338), x_dir=(1, 0, 0), z_dir=(0, 0, 1))) as fillet3_piece_6:
        with BuildLine():
            CenterArc((FILLET3_R, -FILLET3_R), FILLET3_R, 90, 90)
            Line((0, -FILLET3_R), (0, 0))
            Line((0, 0), (FILLET3_R, 0))
        make_face()
    extrude(amount=37.60016, mode=Mode.SUBTRACT)
    with BuildSketch(Plane(origin=(38.19435, 10.5, -19.5331), x_dir=(-1, 0, 0), z_dir=(0, 0, 1))) as fillet3_piece_7:
        with BuildLine():
            CenterArc((FILLET3_R, FILLET3_R), FILLET3_R, 180, 90)
            Line((0, FILLET3_R), (0, 0))
            Line((0, 0), (FILLET3_R, 0))
        make_face()
    extrude(amount=19.49946, mode=Mode.SUBTRACT)
    with BuildSketch(Plane(origin=(75.5697, 10.5, -19.7831), x_dir=(0, 0, -1), z_dir=(-1, 0, 0))) as fillet3_piece_8:
        with BuildLine():
            CenterArc((FILLET3_R, FILLET3_R), FILLET3_R, 180, 90)
            Line((0, FILLET3_R), (0, 0))
            Line((0, 0), (FILLET3_R, 0))
        make_face()
    extrude(amount=37.12535, mode=Mode.SUBTRACT)
    with BuildSketch(Plane(origin=(75.8197, 10.5, -37.6338), x_dir=(-1, 0, 0), z_dir=(0, 0, 1))) as fillet3_piece_9:
        with BuildLine():
            CenterArc((FILLET3_R, FILLET3_R), FILLET3_R, 180, 90)
            Line((0, FILLET3_R), (0, 0))
            Line((0, 0), (FILLET3_R, 0))
        make_face()
    extrude(amount=17.6007, mode=Mode.SUBTRACT)
    with BuildSketch(Plane(origin=(-0.38035, 10.5, -38.1338), x_dir=(-1, 0, 0), z_dir=(0, 0, -1))) as fillet3_piece_10:
        with BuildLine():
            CenterArc((FILLET3_R, -FILLET3_R), FILLET3_R, 90, 90)
            Line((0, -FILLET3_R), (0, 0))
            Line((0, 0), (FILLET3_R, 0))
        make_face()
    extrude(amount=19.4993, mode=Mode.SUBTRACT)
    with BuildSketch(Plane(origin=(-0.13035, 10.5, -57.8831), x_dir=(0, 0, -1), z_dir=(1, 0, 0))) as fillet3_piece_11:
        with BuildLine():
            CenterArc((FILLET3_R, -FILLET3_R), FILLET3_R, 90, 90)
            Line((0, -FILLET3_R), (0, 0))
            Line((0, 0), (FILLET3_R, 0))
        make_face()
    extrude(amount=75.70005, mode=Mode.SUBTRACT)
    with BuildSketch(Plane(origin=(75.5697, 10.5, -20.0331), x_dir=(1, 0, 0), z_dir=(0, 0, -1))) as fillet3_piece_12:
        with BuildLine():
            CenterArc((0.25 - FILLET3_R, FILLET3_R), FILLET3_R, 270, 90)
            Line((0.25, FILLET3_R), (0.25, 0))
            Line((0.25, 0), (0.25 - FILLET3_R, 0))
        make_face()
    revolve(axis=Axis((75.5697, 10.5, -20.0331), (0, -1, 0)), revolution_arc=90, mode=Mode.SUBTRACT)
    with BuildSketch(Plane(origin=(95.569, 10.5, -0.03364), x_dir=(1, 0, 0), z_dir=(0, 0, -1))) as fillet3_piece_13:
        with BuildLine():
            CenterArc((0.25 + FILLET3_R, FILLET3_R), FILLET3_R, 180, 90)
            Line((0.25, FILLET3_R), (0.25, 0))
            Line((0.25, 0), (0.25 + FILLET3_R, 0))
        make_face()
    revolve(axis=Axis((95.569, 10.5, -0.03364), (0, -1, 0)), revolution_arc=90, mode=Mode.SUBTRACT)
    with BuildSketch(Plane(origin=(38.44435, 10.5, -0.03364), x_dir=(0, 0, 1), z_dir=(1, 0, 0))) as fillet3_piece_14:
        with BuildLine():
            CenterArc((0.25 + FILLET3_R, FILLET3_R), FILLET3_R, 180, 90)
            Line((0.25, FILLET3_R), (0.25, 0))
            Line((0.25, 0), (0.25 + FILLET3_R, 0))
        make_face()
    revolve(axis=Axis((38.44435, 10.5, -0.03364), (0, -1, 0)), revolution_arc=90, mode=Mode.SUBTRACT)
    with BuildSketch(Plane(origin=(38.44435, 10.5, -19.5331), x_dir=(-1, 0, 0), z_dir=(0, 0, 1))) as fillet3_piece_15:
        with BuildLine():
            CenterArc((0.25 + FILLET3_R, FILLET3_R), FILLET3_R, 180, 90)
            Line((0.25, FILLET3_R), (0.25, 0))
            Line((0.25, 0), (0.25 + FILLET3_R, 0))
        make_face()
    revolve(axis=Axis((38.44435, 10.5, -19.5331), (0, -1, 0)), revolution_arc=90, mode=Mode.SUBTRACT)
    with BuildSketch(Plane(origin=(95.569, 10.5, -37.6338), x_dir=(1, 0, 0), z_dir=(0, 0, 1))) as fillet3_piece_16:
        with BuildLine():
            CenterArc((0.25 + FILLET3_R, -FILLET3_R), FILLET3_R, 90, 90)
            Line((0.25, -FILLET3_R), (0.25, 0))
            Line((0.25, 0), (0.25 + FILLET3_R, 0))
        make_face()
    revolve(axis=Axis((95.569, 10.5, -37.6338), (0, 1, 0)), revolution_arc=90, mode=Mode.SUBTRACT)
    with BuildSketch(Plane(origin=(75.5697, 10.5, -57.6331), x_dir=(0, 0, -1), z_dir=(-1, 0, 0))) as fillet3_piece_17:
        with BuildLine():
            CenterArc((0.25 + FILLET3_R, FILLET3_R), FILLET3_R, 180, 90)
            Line((0.25, FILLET3_R), (0.25, 0))
            Line((0.25, 0), (0.25 + FILLET3_R, 0))
        make_face()
    revolve(axis=Axis((75.5697, 10.5, -57.6331), (0, -1, 0)), revolution_arc=90, mode=Mode.SUBTRACT)
    with BuildSketch(Plane(origin=(-0.13035, 10.5, -38.1338), x_dir=(-1, 0, 0), z_dir=(0, 0, -1))) as fillet3_piece_18:
        with BuildLine():
            CenterArc((0.25 + FILLET3_R, -FILLET3_R), FILLET3_R, 90, 90)
            Line((0.25, -FILLET3_R), (0.25, 0))
            Line((0.25, 0), (0.25 + FILLET3_R, 0))
        make_face()
    revolve(axis=Axis((-0.13035, 10.5, -38.1338), (0, 1, 0)), revolution_arc=90, mode=Mode.SUBTRACT)
    with BuildSketch(Plane(origin=(-0.13035, 10.5, -57.6331), x_dir=(0, 0, -1), z_dir=(1, 0, 0))) as fillet3_piece_19:
        with BuildLine():
            CenterArc((0.25 + FILLET3_R, -FILLET3_R), FILLET3_R, 90, 90)
            Line((0.25, -FILLET3_R), (0.25, 0))
            Line((0.25, 0), (0.25 + FILLET3_R, 0))
        make_face()
    revolve(axis=Axis((-0.13035, 10.5, -57.6331), (0, 1, 0)), revolution_arc=90, mode=Mode.SUBTRACT)
    with BuildSketch(Plane(origin=(99.3451423, 10.5, -62.9075965), x_dir=(0, 0, 1), z_dir=(-1, 0, 0)), Plane(origin=(-3.9048577, 10.5, 5.2424035), x_dir=(0, 0, -1), z_dir=(1, 0, 0))) as fillet3_piece_20:
        with BuildLine():
            CenterArc((FILLET3_R, -FILLET3_R), FILLET3_R, 90, 90)
            Line((0, -FILLET3_R), (0, 0))
            Line((0, 0), (FILLET3_R, 0))
        make_face()
    extrude(amount=103.25, mode=Mode.SUBTRACT)
    with BuildSketch(Plane(origin=(100.3451423, 10.5, 4.2424035), x_dir=(-1, 0, 0), z_dir=(0, 0, -1)), Plane(origin=(-4.9048577, 10.5, -61.9075965), x_dir=(1, 0, 0), z_dir=(0, 0, 1))) as fillet3_piece_21:
        with BuildLine():
            CenterArc((FILLET3_R, -FILLET3_R), FILLET3_R, 90, 90)
            Line((0, -FILLET3_R), (0, 0))
            Line((0, 0), (FILLET3_R, 0))
        make_face()
    extrude(amount=66.15, mode=Mode.SUBTRACT)
    with BuildSketch(Plane(origin=(-3.9048577, 10.5, -61.9075965), x_dir=(0, 0, -1), z_dir=(1, 0, 0))) as fillet3_piece_22:
        with BuildLine():
            CenterArc((1 - FILLET3_R, -FILLET3_R), FILLET3_R, 0, 90)
            Line((1, -FILLET3_R), (1, 0))
            Line((1, 0), (1 - FILLET3_R, 0))
        make_face()
    revolve(axis=Axis((-3.9048577, 10.5, -61.9075965), (0, 1, 0)), revolution_arc=90, mode=Mode.SUBTRACT)
    with BuildSketch(Plane(origin=(-3.9048577, 10.5, 4.2424035), x_dir=(0, 0, 1), z_dir=(1, 0, 0))) as fillet3_piece_23:
        with BuildLine():
            CenterArc((1 - FILLET3_R, FILLET3_R), FILLET3_R, 270, 90)
            Line((1, FILLET3_R), (1, 0))
            Line((1, 0), (1 - FILLET3_R, 0))
        make_face()
    revolve(axis=Axis((-3.9048577, 10.5, 4.2424035), (0, -1, 0)), revolution_arc=90, mode=Mode.SUBTRACT)
    with BuildSketch(Plane(origin=(99.3451423, 10.5, 4.2424035), x_dir=(1, 0, 0), z_dir=(0, 0, -1))) as fillet3_piece_24:
        with BuildLine():
            CenterArc((1 - FILLET3_R, FILLET3_R), FILLET3_R, 270, 90)
            Line((1, FILLET3_R), (1, 0))
            Line((1, 0), (1 - FILLET3_R, 0))
        make_face()
    revolve(axis=Axis((99.3451423, 10.5, 4.2424035), (0, -1, 0)), revolution_arc=90, mode=Mode.SUBTRACT)
    with BuildSketch(Plane(origin=(99.3451423, 10.5, -61.9075965), x_dir=(1, 0, 0), z_dir=(0, 0, 1))) as fillet3_piece_25:
        with BuildLine():
            CenterArc((1 - FILLET3_R, -FILLET3_R), FILLET3_R, 0, 90)
            Line((1, -FILLET3_R), (1, 0))
            Line((1, 0), (1 - FILLET3_R, 0))
        make_face()
    revolve(axis=Axis((99.3451423, 10.5, -61.9075965), (0, 1, 0)), revolution_arc=90, mode=Mode.SUBTRACT)


solid = part.part
